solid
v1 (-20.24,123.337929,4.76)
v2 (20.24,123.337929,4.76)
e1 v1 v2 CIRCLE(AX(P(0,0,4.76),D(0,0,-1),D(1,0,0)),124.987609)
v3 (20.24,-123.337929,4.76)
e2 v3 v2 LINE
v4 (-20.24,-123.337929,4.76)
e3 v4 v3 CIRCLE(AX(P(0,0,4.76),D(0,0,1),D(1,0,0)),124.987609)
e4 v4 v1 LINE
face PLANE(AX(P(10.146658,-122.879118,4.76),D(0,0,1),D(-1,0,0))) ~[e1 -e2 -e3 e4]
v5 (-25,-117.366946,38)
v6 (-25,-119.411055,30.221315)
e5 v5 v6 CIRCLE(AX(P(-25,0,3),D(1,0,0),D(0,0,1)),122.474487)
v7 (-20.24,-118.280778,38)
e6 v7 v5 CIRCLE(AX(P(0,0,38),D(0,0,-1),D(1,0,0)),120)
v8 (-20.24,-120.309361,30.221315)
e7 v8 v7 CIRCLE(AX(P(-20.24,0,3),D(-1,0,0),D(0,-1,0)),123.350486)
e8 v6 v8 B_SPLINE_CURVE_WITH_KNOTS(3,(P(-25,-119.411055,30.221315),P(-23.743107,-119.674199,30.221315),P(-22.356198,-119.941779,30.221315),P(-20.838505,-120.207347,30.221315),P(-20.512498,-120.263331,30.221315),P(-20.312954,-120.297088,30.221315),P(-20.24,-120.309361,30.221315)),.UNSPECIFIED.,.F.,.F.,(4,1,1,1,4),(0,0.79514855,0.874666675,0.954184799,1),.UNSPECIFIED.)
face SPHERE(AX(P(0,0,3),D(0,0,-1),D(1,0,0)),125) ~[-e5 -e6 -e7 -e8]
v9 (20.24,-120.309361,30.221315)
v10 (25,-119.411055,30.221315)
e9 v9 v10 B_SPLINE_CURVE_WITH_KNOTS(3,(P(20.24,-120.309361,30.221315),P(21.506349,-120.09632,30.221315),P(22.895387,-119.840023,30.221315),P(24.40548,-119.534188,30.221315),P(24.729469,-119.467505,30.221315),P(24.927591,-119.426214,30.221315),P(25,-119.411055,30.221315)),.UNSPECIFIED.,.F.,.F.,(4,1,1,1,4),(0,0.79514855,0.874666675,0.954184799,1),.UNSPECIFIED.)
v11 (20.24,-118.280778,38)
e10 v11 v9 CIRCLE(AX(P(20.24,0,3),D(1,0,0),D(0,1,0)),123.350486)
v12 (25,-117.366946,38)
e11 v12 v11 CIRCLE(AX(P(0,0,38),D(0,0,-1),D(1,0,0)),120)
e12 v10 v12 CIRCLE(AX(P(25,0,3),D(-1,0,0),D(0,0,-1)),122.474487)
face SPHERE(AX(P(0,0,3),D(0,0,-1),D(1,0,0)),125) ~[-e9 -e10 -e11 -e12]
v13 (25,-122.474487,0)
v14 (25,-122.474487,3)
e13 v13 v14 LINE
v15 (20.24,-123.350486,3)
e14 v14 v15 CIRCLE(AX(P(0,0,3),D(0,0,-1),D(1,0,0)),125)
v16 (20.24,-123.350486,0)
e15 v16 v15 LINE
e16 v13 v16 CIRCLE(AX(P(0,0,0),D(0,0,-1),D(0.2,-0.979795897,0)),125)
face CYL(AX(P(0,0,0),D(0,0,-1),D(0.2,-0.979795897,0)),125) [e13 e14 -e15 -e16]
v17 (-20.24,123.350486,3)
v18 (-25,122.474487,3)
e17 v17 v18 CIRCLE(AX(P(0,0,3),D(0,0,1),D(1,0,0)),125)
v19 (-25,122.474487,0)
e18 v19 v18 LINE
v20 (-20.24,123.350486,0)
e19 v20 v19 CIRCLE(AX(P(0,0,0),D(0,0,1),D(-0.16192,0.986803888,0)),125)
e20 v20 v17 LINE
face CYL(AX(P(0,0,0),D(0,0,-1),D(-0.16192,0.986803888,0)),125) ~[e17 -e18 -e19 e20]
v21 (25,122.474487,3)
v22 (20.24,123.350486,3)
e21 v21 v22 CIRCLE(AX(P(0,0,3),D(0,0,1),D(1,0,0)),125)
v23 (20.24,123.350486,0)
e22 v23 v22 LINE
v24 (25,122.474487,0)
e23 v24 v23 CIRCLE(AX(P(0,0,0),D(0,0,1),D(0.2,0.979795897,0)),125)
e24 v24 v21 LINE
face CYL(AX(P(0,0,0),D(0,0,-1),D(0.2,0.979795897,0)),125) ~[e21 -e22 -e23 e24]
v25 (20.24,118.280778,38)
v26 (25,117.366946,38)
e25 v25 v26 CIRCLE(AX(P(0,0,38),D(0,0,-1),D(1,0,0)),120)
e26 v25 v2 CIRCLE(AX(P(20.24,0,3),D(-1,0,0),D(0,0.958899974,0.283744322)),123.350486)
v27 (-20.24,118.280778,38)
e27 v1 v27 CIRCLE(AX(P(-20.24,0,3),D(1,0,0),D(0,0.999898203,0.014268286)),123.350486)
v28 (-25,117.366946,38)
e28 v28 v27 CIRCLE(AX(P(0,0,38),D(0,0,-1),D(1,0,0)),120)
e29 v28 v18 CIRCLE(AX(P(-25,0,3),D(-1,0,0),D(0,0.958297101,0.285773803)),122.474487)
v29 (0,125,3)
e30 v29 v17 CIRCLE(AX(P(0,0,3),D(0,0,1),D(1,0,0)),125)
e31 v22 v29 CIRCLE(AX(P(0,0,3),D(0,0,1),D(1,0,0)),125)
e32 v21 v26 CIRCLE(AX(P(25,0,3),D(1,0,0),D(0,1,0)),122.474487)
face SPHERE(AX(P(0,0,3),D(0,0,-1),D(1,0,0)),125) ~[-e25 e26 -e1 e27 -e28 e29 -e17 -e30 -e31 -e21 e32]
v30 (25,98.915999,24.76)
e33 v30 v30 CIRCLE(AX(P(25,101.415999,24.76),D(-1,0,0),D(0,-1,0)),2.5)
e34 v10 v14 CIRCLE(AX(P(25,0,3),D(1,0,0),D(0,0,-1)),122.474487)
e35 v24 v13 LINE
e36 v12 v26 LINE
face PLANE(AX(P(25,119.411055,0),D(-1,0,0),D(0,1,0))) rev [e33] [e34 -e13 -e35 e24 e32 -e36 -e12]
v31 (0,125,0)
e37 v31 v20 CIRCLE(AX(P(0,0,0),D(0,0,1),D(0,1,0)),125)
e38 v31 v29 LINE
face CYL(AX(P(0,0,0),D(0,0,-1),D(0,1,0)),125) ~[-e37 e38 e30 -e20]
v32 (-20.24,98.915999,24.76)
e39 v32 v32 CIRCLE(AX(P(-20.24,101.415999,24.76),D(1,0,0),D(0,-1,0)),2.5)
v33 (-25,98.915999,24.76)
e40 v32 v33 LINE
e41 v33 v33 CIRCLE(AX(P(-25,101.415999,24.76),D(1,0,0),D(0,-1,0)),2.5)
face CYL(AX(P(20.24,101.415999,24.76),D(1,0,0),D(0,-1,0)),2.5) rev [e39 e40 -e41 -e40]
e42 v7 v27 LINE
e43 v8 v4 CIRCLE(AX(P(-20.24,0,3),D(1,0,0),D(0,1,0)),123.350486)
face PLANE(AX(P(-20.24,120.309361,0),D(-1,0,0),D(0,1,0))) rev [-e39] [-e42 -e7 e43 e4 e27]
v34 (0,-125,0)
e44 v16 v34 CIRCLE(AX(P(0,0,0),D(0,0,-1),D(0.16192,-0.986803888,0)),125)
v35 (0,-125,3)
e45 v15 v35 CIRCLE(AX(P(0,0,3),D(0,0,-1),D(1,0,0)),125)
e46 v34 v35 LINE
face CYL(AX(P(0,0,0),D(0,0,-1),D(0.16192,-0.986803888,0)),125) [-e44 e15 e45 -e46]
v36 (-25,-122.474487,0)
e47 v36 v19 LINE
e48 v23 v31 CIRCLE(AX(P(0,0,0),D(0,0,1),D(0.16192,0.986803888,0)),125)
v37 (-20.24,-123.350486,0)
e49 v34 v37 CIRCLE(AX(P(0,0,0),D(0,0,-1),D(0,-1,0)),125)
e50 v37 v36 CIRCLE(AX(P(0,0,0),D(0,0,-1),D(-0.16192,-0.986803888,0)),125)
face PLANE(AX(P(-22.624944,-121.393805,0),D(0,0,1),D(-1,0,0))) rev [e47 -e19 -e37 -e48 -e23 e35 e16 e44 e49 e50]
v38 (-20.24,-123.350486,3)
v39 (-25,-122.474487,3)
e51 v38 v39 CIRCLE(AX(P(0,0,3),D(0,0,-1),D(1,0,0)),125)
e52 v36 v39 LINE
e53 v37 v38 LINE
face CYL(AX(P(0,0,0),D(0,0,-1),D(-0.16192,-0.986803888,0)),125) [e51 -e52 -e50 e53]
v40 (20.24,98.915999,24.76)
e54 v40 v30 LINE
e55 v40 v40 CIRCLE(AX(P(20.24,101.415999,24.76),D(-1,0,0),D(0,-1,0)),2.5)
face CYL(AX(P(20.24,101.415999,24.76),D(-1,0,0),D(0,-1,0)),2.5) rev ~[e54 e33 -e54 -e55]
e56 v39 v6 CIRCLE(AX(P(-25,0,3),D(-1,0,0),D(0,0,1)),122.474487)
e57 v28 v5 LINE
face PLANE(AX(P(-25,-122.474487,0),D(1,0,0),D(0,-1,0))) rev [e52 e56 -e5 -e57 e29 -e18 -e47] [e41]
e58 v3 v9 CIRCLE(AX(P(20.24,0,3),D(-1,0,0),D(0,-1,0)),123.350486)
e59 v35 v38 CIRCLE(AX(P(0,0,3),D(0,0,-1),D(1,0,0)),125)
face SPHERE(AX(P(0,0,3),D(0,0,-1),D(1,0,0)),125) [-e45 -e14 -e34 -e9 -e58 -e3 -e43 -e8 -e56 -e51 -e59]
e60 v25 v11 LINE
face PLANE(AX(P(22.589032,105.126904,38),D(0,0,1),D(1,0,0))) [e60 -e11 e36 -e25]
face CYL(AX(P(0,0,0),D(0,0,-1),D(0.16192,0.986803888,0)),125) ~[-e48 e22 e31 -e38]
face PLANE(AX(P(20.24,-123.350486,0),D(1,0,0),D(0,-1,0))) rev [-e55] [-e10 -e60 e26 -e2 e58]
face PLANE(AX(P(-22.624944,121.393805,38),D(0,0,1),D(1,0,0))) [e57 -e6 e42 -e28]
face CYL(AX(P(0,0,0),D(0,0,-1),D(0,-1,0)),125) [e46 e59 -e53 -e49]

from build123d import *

# Parameters (mm, degrees)
F1_DEPTH      = 4.76
F4_DEPTH      = 38
F8_R          = 2.5
F9_DEPTH      = 4.7610001
F9_DEPTH_BACK = 45.2410001


# Not quite as in the source:
# - a feature names something its author has since deleted; it is built from what else it names


with BuildPart() as f1:
    # F0 (on Top) → F1 (new body)
    with BuildSketch(Plane.XY):
        with BuildLine():
            Line((20.24, 120.3093612318), (20.24, 123.3504860144))
            ThreePointArc((20.24, 123.3504860144), (10.1535522896, 124.5869390261), (0, 125))
            Line((0, 125), (0, 122))
            ThreePointArc((0, 122), (10.1552432202, 121.5766056244), (20.24, 120.3093612318))
        make_face()
        with BuildLine():
            Line((25, 90.3494910666), (25, 119.4110547646))
            ThreePointArc((25, 119.4110547646), (22.6244588582, 119.8838348626), (20.24, 120.3093612318))
            Line((20.24, 120.3093612318), (20.24, 105.3494910666))
            Line((20.24, 105.3494910666), (20.24, 90.3494910666))
            Line((20.24, 90.3494910666), (25, 90.3494910666))
        make_face()
        with BuildLine():
            ThreePointArc((-20.24, -120.3093612318), (-10.1552432202, -121.5766056244), (0, -122))
            Line((0, -122), (0, 0))
            Line((0, 0), (0, 101.8494910666))
            Line((0, 101.8494910666), (-3.5, 101.8494910666))
            Line((-3.5, 101.8494910666), (-3.5, 108.8494910666))
            Line((-3.5, 108.8494910666), (0, 108.8494910666))
            Line((0, 108.8494910666), (0, 122))
            ThreePointArc((0, 122), (-10.1552432202, 121.5766056244), (-20.24, 120.3093612318))
            Line((-20.24, 120.3093612318), (-20.24, 107.6747455333))
            Line((-20.24, 107.6747455333), (-20.24, 90.3494910666))
            Line((-20.24, 90.3494910666), (-20.24, -120.3093612318))
        make_face()
        with BuildLine():
            Line((0, 0), (0, -122))
            ThreePointArc((0, -122), (10.1552432202, -121.5766056244), (20.24, -120.3093612318))
            Line((20.24, -120.3093612318), (20.24, 90.3494910666))
            Line((20.24, 90.3494910666), (20.24, 105.3494910666))
            Line((20.24, 105.3494910666), (20.24, 120.3093612318))
            ThreePointArc((20.24, 120.3093612318), (10.1552432202, 121.5766056244), (0, 122))
            Line((0, 122), (0, 108.8494910666))
            Line((0, 108.8494910666), (3.5, 108.8494910666))
            Line((3.5, 108.8494910666), (3.5, 101.8494910666))
            Line((3.5, 101.8494910666), (0, 101.8494910666))
            Line((0, 101.8494910666), (0, 0))
        make_face()
        with BuildLine():
            Line((0, 122), (0, 125))
            ThreePointArc((0, 125), (-10.1535522896, 124.5869390261), (-20.24, 123.3504860144))
            Line((-20.24, 123.3504860144), (-20.24, 120.3093612318))
            ThreePointArc((-20.24, 120.3093612318), (-10.1552432202, 121.5766056244), (0, 122))
        make_face()
        with BuildLine():
            Line((25, -119.4110547646), (25, 90.3494910666))
            Line((25, 90.3494910666), (20.24, 90.3494910666))
            Line((20.24, 90.3494910666), (20.24, -120.3093612318))
            ThreePointArc((20.24, -120.3093612318), (22.6244588582, -119.8838348626), (25, -119.4110547646))
        make_face()
        with BuildLine():
            ThreePointArc((-20.24, 120.3093612318), (-22.6244588582, 119.8838348626), (-25, 119.4110547646))
            Line((-25, 119.4110547646), (-25, 90.3494910666))
            Line((-25, 90.3494910666), (-20.24, 90.3494910666))
            Line((-20.24, 90.3494910666), (-20.24, 107.6747455333))
            Line((-20.24, 107.6747455333), (-20.24, 120.3093612318))
        make_face()
        with BuildLine():
            ThreePointArc((-25, -119.4110547646), (-22.6244588582, -119.8838348626), (-20.24, -120.3093612318))
            Line((-20.24, -120.3093612318), (-20.24, 90.3494910666))
            Line((-20.24, 90.3494910666), (-25, 90.3494910666))
            Line((-25, 90.3494910666), (-25, -119.4110547646))
        make_face()
    extrude(amount=F1_DEPTH)

    # F0 (on Top) → F4 (join)
    with BuildSketch(Plane.XY):
        with BuildLine():
            ThreePointArc((-20.24, 123.3504860144), (-22.6242401752, 122.9355268281), (-25, 122.4744871392))
            Line((-25, 122.4744871392), (-25, 119.4110547646))
            ThreePointArc((-25, 119.4110547646), (-22.6244588582, 119.8838348626), (-20.24, 120.3093612318))
            Line((-20.24, 120.3093612318), (-20.24, 123.3504860144))
        make_face()
        with BuildLine():
            ThreePointArc((-20.24, 120.3093612318), (-22.6244588582, 119.8838348626), (-25, 119.4110547646))
            Line((-25, 119.4110547646), (-25, 90.3494910666))
            Line((-25, 90.3494910666), (-20.24, 90.3494910666))
            Line((-20.24, 90.3494910666), (-20.24, 107.6747455333))
            Line((-20.24, 107.6747455333), (-20.24, 120.3093612318))
        make_face()
        with BuildLine():
            Line((25, 90.3494910666), (25, 119.4110547646))
            ThreePointArc((25, 119.4110547646), (22.6244588582, 119.8838348626), (20.24, 120.3093612318))
            Line((20.24, 120.3093612318), (20.24, 105.3494910666))
            Line((20.24, 105.3494910666), (20.24, 90.3494910666))
            Line((20.24, 90.3494910666), (25, 90.3494910666))
        make_face()
        with BuildLine():
            Line((25, 119.4110547646), (25, 122.4744871392))
            ThreePointArc((25, 122.4744871392), (22.6242401752, 122.9355268281), (20.24, 123.3504860144))
            Line((20.24, 123.3504860144), (20.24, 120.3093612318))
            ThreePointArc((20.24, 120.3093612318), (22.6244588582, 119.8838348626), (25, 119.4110547646))
        make_face()
        with BuildLine():
            Line((25, -119.4110547646), (25, 90.3494910666))
            Line((25, 90.3494910666), (20.24, 90.3494910666))
            Line((20.24, 90.3494910666), (20.24, -120.3093612318))
            ThreePointArc((20.24, -120.3093612318), (22.6244588582, -119.8838348626), (25, -119.4110547646))
        make_face()
        with BuildLine():
            ThreePointArc((-25, -119.4110547646), (-22.6244588582, -119.8838348626), (-20.24, -120.3093612318))
            Line((-20.24, -120.3093612318), (-20.24, 90.3494910666))
            Line((-20.24, 90.3494910666), (-25, 90.3494910666))
            Line((-25, 90.3494910666), (-25, -119.4110547646))
        make_face()
    extrude(amount=F4_DEPTH)

    # F2 (on Front) → F6 (revolve, cut)
    with BuildSketch(Plane.XZ):
        with BuildLine():
            ThreePointArc((0, 128), (88.3883476483, 91.3883476483), (125, 3))
            Line((125, 3), (150, 3))
            ThreePointArc((150, 3), (106.066017178, 109.066017178), (0, 153))
            Line((0, 153), (0, 128))
        make_face()
    revolve(axis=Axis((0, 0, 64), (0, 0, 1)), mode=Mode.SUBTRACT)

    # F7: F1 across face


with BuildPart() as f1_1:
    add(f1.part)
    add(f1.part.mirror(Plane.XZ))

    # F8 (on face) → F9 (cut, two sides)
    with BuildSketch(Plane(origin=(20.24, 0, 0), x_dir=(0, -1, 0), z_dir=(-1, 0, 0))) as f9_sk:
        with Locations((-101.4159989458, 24.76)):
            Circle(F8_R)
    extrude(amount=-F9_DEPTH, mode=Mode.SUBTRACT)
    extrude(f9_sk.sketch, amount=F9_DEPTH_BACK, mode=Mode.SUBTRACT)


solid = f1_1.part
